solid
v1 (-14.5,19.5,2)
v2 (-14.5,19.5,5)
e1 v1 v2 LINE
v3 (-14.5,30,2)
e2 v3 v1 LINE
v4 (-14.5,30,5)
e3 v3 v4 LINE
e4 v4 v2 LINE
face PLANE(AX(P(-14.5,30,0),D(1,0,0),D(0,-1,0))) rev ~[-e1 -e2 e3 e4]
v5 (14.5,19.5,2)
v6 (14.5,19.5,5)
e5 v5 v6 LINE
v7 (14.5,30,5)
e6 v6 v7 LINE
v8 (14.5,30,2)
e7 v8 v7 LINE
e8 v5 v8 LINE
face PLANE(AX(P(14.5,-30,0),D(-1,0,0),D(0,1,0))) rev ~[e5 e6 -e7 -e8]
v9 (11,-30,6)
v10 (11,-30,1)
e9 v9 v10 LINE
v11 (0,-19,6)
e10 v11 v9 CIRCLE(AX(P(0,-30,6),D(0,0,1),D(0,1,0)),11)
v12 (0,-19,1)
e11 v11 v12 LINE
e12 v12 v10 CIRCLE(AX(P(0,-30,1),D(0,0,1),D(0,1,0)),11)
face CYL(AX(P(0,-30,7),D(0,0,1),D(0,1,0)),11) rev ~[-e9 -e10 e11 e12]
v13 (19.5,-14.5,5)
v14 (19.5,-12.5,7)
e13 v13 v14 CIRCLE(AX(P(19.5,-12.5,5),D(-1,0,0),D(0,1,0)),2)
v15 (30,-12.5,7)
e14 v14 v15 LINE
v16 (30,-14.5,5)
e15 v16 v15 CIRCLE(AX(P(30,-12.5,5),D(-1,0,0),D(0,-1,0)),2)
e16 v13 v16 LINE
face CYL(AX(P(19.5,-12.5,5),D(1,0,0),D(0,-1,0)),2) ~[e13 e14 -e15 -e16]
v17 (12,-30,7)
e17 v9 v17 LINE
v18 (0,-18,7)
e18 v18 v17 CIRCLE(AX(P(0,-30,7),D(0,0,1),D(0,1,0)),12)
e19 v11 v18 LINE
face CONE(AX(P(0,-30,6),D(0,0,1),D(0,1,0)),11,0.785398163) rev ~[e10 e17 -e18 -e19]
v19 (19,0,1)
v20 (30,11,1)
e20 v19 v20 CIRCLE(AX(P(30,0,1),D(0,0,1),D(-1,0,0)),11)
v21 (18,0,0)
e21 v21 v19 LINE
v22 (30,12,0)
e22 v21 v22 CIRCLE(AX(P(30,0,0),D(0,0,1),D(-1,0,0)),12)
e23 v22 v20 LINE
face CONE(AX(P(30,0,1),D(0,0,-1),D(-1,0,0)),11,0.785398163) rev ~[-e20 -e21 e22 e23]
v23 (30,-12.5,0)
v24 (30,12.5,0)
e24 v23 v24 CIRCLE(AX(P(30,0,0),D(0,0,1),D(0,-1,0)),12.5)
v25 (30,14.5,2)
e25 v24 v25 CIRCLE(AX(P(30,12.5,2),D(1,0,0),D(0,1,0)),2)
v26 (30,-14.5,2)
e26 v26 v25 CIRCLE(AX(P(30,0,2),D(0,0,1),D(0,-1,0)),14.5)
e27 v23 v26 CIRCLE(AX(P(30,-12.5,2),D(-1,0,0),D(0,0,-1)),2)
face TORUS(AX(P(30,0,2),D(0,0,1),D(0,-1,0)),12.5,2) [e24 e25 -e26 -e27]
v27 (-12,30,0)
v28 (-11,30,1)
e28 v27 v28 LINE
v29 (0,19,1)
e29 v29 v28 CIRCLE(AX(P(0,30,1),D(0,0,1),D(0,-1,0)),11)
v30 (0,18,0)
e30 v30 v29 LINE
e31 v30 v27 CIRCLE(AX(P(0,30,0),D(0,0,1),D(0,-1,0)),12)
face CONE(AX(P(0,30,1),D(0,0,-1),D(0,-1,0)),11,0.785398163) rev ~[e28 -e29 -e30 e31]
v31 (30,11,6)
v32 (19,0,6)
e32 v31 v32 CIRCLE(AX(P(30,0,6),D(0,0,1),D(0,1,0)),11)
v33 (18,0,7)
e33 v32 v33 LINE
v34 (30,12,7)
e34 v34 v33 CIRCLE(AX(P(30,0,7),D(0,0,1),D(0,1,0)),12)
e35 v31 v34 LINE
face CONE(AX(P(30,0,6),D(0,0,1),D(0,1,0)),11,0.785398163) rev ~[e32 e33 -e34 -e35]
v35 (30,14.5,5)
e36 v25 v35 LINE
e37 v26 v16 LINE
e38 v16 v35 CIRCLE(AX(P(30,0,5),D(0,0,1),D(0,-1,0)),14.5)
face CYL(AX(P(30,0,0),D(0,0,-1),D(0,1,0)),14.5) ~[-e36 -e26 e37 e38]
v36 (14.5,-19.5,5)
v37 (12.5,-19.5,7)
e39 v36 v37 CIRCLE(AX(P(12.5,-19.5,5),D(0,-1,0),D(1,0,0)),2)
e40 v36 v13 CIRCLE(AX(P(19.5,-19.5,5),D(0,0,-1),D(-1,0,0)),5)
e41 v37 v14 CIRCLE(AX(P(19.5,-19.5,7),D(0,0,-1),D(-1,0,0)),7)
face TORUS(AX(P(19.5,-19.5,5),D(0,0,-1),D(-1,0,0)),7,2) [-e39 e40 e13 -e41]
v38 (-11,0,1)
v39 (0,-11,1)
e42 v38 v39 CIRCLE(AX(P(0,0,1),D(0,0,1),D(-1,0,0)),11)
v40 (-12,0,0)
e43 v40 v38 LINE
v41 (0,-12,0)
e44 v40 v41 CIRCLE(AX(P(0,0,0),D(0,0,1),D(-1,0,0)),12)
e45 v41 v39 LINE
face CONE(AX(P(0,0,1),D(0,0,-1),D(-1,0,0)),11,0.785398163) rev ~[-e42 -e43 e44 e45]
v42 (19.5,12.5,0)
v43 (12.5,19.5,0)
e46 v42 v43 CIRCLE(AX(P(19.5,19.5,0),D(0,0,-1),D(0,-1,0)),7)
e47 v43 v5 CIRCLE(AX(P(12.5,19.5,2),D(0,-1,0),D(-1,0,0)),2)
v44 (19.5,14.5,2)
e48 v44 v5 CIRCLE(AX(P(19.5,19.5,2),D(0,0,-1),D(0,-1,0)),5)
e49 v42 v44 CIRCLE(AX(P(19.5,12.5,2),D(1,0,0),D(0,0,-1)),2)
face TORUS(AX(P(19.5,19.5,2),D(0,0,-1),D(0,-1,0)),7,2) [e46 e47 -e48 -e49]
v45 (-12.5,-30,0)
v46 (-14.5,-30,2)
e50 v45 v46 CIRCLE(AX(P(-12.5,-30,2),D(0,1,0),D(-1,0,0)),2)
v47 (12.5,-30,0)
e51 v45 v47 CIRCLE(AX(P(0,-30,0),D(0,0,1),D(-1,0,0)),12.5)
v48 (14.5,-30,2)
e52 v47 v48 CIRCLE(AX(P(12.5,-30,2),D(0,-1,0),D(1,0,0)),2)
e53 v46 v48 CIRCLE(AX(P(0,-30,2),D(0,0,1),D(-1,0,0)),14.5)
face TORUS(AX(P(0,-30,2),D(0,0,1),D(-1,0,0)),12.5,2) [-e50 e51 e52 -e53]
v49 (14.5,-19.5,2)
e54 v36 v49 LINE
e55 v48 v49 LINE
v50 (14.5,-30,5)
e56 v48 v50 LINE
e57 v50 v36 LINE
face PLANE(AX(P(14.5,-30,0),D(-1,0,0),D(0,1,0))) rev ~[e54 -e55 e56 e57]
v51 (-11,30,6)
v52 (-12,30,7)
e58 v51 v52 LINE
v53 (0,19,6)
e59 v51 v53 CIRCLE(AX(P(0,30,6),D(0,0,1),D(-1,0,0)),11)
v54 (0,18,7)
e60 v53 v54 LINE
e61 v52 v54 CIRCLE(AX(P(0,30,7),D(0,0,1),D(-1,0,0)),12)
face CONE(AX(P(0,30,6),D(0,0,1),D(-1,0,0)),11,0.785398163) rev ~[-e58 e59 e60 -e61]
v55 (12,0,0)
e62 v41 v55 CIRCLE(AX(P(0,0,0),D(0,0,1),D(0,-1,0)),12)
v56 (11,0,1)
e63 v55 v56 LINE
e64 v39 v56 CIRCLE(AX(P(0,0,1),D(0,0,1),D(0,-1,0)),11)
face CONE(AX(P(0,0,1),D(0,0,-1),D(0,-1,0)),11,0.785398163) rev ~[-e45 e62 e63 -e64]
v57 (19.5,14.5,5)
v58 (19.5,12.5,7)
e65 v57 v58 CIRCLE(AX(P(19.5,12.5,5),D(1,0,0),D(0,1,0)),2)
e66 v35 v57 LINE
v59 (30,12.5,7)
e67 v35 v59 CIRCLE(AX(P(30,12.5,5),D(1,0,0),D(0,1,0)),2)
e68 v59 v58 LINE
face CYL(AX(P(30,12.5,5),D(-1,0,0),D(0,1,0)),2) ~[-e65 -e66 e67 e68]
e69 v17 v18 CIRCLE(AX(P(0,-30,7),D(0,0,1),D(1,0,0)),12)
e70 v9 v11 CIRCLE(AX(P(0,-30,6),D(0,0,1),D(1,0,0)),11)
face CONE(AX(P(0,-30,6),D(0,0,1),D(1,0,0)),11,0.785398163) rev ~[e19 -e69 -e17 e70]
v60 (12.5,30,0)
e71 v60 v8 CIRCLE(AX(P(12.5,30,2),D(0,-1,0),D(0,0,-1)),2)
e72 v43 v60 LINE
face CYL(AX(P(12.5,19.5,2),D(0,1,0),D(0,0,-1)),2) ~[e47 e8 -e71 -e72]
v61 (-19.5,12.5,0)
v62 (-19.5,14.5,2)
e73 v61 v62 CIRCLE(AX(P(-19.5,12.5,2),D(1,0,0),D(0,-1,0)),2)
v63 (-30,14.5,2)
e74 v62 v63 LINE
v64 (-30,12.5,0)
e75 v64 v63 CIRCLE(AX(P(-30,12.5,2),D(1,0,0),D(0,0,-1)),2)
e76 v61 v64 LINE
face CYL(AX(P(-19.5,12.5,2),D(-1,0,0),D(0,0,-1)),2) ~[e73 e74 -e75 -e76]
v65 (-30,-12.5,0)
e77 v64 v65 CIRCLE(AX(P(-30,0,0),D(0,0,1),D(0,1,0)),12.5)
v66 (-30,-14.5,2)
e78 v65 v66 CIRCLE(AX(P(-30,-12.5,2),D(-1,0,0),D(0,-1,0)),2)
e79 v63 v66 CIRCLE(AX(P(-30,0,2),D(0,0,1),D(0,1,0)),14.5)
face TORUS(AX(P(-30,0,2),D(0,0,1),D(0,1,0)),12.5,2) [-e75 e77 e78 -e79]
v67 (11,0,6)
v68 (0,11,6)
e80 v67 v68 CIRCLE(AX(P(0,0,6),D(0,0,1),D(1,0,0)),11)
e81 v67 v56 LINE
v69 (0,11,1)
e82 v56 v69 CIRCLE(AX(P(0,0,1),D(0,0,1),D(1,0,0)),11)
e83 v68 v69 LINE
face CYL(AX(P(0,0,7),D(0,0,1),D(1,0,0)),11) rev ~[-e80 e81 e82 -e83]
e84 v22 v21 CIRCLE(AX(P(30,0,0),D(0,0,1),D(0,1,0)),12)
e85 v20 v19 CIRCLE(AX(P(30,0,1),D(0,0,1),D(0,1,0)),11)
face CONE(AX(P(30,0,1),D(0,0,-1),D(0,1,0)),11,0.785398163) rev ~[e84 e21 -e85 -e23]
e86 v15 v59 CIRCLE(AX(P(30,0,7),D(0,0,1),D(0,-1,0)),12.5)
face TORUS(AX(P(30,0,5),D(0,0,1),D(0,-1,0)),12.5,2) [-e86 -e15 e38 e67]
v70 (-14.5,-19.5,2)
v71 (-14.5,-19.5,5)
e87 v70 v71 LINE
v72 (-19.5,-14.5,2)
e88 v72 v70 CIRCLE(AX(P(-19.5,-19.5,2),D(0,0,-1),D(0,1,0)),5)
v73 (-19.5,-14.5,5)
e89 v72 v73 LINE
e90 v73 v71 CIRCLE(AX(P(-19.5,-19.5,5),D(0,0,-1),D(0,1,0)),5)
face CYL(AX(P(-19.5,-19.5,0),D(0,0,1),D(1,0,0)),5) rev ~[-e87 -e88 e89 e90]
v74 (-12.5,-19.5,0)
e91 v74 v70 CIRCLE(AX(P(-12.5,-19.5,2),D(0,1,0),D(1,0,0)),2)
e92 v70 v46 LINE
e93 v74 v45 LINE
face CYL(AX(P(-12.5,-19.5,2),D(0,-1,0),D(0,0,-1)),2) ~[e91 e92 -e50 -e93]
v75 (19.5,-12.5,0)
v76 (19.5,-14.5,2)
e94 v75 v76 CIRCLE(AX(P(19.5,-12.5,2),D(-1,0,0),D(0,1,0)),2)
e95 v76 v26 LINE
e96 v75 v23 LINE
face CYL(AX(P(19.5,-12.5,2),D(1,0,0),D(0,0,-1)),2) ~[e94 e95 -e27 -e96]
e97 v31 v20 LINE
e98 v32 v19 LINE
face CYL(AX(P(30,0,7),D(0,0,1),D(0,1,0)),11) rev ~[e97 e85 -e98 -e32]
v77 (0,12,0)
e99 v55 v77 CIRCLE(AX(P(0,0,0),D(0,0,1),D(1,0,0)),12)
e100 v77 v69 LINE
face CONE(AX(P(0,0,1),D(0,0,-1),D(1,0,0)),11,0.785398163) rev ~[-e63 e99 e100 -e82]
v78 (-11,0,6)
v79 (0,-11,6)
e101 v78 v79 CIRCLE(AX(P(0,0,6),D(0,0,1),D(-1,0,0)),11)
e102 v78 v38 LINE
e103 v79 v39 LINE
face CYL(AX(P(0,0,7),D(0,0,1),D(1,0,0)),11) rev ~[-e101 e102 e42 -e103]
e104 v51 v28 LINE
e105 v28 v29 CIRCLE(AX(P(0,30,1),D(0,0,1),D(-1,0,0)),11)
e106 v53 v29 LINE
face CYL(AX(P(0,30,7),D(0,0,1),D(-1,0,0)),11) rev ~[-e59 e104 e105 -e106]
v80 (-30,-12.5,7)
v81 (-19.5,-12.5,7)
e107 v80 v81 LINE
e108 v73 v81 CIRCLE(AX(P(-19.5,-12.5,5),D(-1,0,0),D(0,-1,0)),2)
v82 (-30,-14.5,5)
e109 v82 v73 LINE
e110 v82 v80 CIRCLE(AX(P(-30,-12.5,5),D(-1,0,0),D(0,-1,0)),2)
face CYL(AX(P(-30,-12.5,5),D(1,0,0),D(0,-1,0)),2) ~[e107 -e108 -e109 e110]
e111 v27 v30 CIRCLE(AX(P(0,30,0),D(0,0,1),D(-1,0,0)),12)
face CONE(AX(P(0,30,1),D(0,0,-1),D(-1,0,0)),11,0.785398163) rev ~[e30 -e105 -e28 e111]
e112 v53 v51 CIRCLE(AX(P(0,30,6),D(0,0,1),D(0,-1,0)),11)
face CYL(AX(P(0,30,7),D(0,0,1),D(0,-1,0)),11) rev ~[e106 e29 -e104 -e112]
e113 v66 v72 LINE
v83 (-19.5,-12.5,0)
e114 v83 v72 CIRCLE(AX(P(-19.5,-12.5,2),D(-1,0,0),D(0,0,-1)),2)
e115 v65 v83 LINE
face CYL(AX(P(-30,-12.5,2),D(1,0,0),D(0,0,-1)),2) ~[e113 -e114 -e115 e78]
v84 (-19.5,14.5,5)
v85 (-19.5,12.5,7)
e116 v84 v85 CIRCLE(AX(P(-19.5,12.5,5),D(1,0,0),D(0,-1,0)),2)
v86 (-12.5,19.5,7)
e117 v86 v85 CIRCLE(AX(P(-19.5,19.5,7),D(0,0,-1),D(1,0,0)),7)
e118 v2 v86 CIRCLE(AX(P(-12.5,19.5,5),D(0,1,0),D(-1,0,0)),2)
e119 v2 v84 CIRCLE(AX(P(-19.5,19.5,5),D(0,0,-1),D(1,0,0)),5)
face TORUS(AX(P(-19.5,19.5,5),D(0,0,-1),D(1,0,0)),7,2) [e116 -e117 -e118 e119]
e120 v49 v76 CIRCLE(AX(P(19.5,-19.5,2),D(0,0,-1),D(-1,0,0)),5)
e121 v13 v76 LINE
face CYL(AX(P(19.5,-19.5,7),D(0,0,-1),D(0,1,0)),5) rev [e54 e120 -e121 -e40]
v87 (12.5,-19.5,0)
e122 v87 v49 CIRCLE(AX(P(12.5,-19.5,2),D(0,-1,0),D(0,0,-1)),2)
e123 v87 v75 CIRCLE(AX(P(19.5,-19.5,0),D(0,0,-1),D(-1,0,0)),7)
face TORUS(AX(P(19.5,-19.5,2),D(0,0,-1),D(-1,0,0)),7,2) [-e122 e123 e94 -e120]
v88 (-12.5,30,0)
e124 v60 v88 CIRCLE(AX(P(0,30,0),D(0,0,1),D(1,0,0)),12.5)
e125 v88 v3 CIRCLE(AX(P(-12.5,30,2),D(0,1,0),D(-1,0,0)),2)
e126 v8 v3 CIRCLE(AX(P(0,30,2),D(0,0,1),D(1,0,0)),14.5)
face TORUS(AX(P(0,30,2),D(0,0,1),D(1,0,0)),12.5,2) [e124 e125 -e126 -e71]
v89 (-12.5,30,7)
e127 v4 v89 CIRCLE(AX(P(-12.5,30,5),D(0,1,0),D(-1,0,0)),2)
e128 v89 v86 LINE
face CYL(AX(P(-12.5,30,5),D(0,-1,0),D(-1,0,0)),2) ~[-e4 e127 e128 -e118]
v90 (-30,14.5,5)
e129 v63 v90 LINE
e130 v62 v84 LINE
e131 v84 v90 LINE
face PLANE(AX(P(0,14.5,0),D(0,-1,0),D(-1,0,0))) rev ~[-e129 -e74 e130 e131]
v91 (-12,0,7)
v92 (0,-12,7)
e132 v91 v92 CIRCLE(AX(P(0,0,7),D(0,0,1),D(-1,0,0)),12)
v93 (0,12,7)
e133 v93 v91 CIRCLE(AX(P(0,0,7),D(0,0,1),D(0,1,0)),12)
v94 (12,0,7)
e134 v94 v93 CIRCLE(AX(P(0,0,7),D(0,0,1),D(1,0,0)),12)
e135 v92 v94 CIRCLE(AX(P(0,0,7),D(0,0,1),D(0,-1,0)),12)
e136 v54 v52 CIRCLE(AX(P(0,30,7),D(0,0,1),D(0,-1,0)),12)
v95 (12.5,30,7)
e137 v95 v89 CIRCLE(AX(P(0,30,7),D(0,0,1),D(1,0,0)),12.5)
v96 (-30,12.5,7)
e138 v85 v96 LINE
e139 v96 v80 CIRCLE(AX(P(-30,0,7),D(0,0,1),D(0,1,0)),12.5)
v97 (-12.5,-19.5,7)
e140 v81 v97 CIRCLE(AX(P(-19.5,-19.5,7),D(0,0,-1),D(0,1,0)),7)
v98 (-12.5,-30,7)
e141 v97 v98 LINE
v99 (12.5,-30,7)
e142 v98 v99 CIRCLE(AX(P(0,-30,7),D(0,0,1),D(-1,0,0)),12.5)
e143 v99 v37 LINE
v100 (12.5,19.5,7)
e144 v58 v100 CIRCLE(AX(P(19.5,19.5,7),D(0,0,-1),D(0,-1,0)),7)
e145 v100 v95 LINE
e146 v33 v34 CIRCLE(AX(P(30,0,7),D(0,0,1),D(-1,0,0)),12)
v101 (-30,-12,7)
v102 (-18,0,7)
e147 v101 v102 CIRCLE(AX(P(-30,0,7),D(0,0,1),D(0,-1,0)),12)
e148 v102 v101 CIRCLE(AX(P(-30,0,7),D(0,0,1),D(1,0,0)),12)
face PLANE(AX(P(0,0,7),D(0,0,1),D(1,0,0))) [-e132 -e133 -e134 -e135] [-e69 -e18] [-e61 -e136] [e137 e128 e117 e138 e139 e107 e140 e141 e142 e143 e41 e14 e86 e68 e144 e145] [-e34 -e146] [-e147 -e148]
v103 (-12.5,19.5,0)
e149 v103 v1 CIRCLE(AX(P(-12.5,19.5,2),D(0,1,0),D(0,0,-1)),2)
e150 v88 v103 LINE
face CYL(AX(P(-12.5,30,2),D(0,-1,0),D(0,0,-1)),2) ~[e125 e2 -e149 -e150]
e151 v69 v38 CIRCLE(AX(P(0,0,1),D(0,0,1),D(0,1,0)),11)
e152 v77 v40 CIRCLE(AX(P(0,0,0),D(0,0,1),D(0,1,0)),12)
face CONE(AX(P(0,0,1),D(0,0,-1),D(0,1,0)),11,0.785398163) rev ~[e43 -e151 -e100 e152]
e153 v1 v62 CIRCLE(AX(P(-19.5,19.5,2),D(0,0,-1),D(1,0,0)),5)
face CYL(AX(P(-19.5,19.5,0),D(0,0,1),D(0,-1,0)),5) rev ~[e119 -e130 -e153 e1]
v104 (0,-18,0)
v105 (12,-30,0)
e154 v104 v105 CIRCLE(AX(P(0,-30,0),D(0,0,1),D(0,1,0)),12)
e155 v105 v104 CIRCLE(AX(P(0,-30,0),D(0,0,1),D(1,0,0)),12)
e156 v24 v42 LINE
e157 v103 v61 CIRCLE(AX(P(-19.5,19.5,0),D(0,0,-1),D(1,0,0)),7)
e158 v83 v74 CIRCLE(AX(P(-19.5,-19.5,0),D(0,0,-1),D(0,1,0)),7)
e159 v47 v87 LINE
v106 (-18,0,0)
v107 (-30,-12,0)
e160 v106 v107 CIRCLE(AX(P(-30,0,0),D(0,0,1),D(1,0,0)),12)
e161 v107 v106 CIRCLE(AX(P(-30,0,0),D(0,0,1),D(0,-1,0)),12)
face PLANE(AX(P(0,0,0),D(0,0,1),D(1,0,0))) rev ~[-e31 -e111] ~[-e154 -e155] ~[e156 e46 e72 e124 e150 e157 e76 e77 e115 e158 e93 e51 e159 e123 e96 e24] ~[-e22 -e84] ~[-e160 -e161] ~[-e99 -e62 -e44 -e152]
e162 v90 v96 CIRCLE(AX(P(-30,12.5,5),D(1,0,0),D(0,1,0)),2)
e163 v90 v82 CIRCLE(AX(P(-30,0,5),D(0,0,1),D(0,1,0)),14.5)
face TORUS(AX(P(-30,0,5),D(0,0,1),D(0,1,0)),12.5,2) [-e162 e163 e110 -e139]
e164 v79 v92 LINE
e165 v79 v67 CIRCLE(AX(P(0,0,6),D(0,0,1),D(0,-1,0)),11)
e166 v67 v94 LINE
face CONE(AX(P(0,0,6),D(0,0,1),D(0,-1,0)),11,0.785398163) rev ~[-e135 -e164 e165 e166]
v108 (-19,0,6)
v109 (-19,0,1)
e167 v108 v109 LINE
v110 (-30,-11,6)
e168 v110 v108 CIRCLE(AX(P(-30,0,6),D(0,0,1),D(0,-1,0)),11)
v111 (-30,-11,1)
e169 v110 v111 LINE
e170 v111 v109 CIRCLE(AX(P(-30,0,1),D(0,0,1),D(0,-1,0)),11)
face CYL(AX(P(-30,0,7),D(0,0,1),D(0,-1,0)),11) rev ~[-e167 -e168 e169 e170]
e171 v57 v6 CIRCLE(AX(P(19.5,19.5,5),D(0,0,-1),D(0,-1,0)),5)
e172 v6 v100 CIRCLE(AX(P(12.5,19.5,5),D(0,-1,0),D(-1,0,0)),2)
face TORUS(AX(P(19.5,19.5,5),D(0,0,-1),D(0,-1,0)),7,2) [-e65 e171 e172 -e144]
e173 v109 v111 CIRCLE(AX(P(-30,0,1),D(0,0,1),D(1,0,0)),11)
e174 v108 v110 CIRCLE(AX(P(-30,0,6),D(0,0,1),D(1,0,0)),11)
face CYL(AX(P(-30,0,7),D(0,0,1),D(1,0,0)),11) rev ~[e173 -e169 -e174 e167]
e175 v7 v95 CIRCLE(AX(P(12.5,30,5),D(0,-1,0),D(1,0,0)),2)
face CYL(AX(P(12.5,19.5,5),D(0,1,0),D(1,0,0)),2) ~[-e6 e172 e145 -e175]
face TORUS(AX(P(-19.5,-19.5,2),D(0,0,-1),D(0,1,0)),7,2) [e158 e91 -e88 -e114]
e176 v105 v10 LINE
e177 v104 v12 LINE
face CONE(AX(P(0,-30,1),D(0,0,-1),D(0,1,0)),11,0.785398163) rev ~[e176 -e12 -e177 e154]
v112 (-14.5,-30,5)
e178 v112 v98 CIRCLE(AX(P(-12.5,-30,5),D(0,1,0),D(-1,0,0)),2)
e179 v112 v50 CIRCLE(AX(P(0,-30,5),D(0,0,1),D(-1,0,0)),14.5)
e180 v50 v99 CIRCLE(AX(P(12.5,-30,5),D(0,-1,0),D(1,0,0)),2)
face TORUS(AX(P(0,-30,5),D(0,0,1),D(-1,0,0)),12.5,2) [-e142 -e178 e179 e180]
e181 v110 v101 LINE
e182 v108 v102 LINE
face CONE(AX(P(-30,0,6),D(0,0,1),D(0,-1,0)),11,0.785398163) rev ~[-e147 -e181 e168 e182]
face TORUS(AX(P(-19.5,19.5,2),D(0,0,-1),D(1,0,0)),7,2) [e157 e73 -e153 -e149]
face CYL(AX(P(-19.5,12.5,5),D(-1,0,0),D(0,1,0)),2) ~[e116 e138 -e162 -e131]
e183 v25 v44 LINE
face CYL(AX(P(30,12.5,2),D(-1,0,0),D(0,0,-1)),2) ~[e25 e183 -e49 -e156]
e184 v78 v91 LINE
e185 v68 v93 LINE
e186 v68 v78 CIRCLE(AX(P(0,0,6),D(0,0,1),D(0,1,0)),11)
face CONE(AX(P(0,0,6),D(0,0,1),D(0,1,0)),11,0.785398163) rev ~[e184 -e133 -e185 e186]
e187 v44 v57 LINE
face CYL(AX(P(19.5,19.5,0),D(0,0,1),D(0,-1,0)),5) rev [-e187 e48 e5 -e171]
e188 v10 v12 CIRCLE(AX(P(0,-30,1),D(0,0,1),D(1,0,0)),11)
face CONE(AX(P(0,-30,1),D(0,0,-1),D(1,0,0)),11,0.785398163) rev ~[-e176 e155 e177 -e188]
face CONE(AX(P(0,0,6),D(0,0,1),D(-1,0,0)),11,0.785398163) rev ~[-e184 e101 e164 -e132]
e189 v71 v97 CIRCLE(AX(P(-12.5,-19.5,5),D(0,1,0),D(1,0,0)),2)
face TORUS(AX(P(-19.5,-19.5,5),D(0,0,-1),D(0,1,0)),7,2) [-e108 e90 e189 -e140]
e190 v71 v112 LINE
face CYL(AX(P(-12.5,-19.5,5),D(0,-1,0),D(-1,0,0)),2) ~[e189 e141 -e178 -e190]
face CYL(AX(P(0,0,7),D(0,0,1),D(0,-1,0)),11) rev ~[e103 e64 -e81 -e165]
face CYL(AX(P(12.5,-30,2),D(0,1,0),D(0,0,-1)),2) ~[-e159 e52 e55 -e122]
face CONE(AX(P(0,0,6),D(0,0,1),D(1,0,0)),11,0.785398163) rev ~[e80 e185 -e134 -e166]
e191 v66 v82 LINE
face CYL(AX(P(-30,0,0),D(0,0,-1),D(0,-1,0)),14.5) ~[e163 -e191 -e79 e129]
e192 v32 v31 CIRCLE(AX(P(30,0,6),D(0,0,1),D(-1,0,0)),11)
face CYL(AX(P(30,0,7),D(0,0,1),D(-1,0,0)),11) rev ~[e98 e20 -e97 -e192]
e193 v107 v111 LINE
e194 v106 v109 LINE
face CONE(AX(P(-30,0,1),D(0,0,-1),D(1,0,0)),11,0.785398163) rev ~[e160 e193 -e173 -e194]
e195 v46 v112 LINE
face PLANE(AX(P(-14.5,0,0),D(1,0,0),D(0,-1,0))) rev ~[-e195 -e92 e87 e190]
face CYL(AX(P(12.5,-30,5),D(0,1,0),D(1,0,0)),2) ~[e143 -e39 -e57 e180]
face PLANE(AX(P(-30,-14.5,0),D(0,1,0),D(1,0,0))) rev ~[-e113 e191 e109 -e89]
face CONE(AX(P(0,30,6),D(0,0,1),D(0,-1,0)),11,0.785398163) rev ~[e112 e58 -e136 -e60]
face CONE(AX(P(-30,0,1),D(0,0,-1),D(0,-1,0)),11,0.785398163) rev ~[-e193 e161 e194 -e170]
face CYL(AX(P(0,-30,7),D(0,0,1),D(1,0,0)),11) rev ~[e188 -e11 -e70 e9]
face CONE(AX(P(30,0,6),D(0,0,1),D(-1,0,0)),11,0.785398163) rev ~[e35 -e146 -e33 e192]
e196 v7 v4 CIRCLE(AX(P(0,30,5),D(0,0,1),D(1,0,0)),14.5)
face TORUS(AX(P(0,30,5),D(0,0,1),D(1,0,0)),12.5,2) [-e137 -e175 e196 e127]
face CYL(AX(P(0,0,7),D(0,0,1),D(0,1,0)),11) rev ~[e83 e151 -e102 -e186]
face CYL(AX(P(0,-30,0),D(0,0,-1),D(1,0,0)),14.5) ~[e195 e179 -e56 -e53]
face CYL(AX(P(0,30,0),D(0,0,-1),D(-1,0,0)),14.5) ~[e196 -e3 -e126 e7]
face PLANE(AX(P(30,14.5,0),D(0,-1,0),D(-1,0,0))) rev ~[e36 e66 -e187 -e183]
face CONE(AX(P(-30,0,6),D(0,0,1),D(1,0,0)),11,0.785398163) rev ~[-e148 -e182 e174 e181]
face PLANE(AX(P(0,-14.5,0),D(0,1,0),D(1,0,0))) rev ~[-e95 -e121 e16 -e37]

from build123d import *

# Parameters (mm, degrees)
F1_DEPTH = 7
F3_DEPTH = 7.001
F5_COUNT = 4
F7_R     = 5
F8_R     = 2
F9_SIZE  = 1


# Not quite as in the source:
# - a feature names something its author has since deleted; it is built from what else it names


with BuildPart() as f1:
    # F0 (on Top) → F1 (new body)
    with BuildSketch(Plane.XY):
        with BuildLine():
            ThreePointArc((-14.5, 0), (0, -14.5), (14.5, 0))
            ThreePointArc((14.5, 0), (0, 14.5), (-14.5, 0))
        make_face()
        with BuildLine():
            Line((14.5, -30), (14.5, 0))
            ThreePointArc((14.5, 0), (0, -14.5), (-14.5, 0))
            Line((-14.5, 0), (-14.5, -30))
            ThreePointArc((-14.5, -30), (0, -15.5), (14.5, -30))
        make_face()
        with BuildLine():
            ThreePointArc((-14.5, -30), (0, -44.5), (14.5, -30))
            ThreePointArc((14.5, -30), (0, -15.5), (-14.5, -30))
        make_face()
    extrude(amount=F1_DEPTH)

    # F2 (on face) → F3 (cut, through all)
    with BuildSketch(Plane.XY.offset(7)):
        with BuildLine():
            ThreePointArc((0, -11), (7.7781745931, -7.7781745931), (11, 0))
            ThreePointArc((11, 0), (-7.7781745931, 7.7781745931), (0, -11))
        make_face()
        with BuildLine():
            ThreePointArc((11, -30), (7.7781745931, -22.2218254069), (0, -19))
            ThreePointArc((0, -19), (-7.7781745931, -37.7781745931), (11, -30))
        make_face()
    extrude(amount=-F3_DEPTH, mode=Mode.SUBTRACT)


with BuildPart() as f5_1:
    # F5: instance of F1
    add(f1.part.rotate(Axis((0, 0, 13.2415927947), (0, 0, 1)), 1 * 360 / F5_COUNT))


with BuildPart() as f5_2:
    # F5: instance of F1
    add(f1.part.rotate(Axis((0, 0, 13.2415927947), (0, 0, 1)), 2 * 360 / F5_COUNT))


with BuildPart() as f5_3:
    # F5: instance of F1
    add(f1.part.rotate(Axis((0, 0, 13.2415927947), (0, 0, 1)), 3 * 360 / F5_COUNT))


with BuildPart() as f1_1:
    add(f1.part)

    # F6: union F5_3, F5_2, F5_1
    add(f5_3.part)
    add(f5_2.part)
    add(f5_1.part)

    # F7
    f7_edges = [f1_1.edges().sort_by_distance(p)[0] for p in [
        (14.5, -14.5, 3.5),
        (14.5, 14.5, 3.5),
        (-14.5, -14.5, 3.5),
        (-14.5, 14.5, 3.5),
    ]]
    fillet(f7_edges, radius=F7_R)

    # F8
    f8_edges = [f1_1.edges().sort_by_distance(p)[0] for p in [
        (44.5, 0, 7),
        (0, -44.5, 0),
        (24.75, -14.5, 0),
        (15.964466, -15.964466, 0),
        (44.5, 0, 0),
        (14.5, -24.75, 0),
        (24.75, 14.5, 0),
        (15.964466, 15.964466, 0),
        (-14.5, -24.75, 0),
        (14.5, 24.75, 0),
        (-15.964466, -15.964466, 0),
        (0, 44.5, 0),
        (-24.75, -14.5, 0),
        (-14.5, 24.75, 0),
        (-44.5, 0, 0),
        (-15.964466, 15.964466, 0),
        (-24.75, 14.5, 0),
        (24.75, -14.5, 7),
        (15.964466, -15.964466, 7),
        (14.5, -24.75, 7),
        (24.75, 14.5, 7),
        (0, -44.5, 7),
        (15.964466, 15.964466, 7),
        (-14.5, -24.75, 7),
        (14.5, 24.75, 7),
        (-15.964466, -15.964466, 7),
        (0, 44.5, 7),
        (-24.75, -14.5, 7),
        (-14.5, 24.75, 7),
        (-44.5, 0, 7),
        (-15.964466, 15.964466, 7),
        (-24.75, 14.5, 7),
    ]]
    fillet(f8_edges, radius=F8_R)

    # F9
    f9_edges = [f1_1.edges().sort_by_distance(p)[0] for p in [
        (0, 11, 7),
        (0, 41, 7),
        (-41, 0, 7),
        (0, -41, 7),
        (41, 0, 7),
        (0, -41, 0),
        (41, 0, 0),
        (0, 41, 0),
        (-41, 0, 0),
        (0, 11, 0),
    ]]
    chamfer(f9_edges, length=F9_SIZE)


solid = f1_1.part
